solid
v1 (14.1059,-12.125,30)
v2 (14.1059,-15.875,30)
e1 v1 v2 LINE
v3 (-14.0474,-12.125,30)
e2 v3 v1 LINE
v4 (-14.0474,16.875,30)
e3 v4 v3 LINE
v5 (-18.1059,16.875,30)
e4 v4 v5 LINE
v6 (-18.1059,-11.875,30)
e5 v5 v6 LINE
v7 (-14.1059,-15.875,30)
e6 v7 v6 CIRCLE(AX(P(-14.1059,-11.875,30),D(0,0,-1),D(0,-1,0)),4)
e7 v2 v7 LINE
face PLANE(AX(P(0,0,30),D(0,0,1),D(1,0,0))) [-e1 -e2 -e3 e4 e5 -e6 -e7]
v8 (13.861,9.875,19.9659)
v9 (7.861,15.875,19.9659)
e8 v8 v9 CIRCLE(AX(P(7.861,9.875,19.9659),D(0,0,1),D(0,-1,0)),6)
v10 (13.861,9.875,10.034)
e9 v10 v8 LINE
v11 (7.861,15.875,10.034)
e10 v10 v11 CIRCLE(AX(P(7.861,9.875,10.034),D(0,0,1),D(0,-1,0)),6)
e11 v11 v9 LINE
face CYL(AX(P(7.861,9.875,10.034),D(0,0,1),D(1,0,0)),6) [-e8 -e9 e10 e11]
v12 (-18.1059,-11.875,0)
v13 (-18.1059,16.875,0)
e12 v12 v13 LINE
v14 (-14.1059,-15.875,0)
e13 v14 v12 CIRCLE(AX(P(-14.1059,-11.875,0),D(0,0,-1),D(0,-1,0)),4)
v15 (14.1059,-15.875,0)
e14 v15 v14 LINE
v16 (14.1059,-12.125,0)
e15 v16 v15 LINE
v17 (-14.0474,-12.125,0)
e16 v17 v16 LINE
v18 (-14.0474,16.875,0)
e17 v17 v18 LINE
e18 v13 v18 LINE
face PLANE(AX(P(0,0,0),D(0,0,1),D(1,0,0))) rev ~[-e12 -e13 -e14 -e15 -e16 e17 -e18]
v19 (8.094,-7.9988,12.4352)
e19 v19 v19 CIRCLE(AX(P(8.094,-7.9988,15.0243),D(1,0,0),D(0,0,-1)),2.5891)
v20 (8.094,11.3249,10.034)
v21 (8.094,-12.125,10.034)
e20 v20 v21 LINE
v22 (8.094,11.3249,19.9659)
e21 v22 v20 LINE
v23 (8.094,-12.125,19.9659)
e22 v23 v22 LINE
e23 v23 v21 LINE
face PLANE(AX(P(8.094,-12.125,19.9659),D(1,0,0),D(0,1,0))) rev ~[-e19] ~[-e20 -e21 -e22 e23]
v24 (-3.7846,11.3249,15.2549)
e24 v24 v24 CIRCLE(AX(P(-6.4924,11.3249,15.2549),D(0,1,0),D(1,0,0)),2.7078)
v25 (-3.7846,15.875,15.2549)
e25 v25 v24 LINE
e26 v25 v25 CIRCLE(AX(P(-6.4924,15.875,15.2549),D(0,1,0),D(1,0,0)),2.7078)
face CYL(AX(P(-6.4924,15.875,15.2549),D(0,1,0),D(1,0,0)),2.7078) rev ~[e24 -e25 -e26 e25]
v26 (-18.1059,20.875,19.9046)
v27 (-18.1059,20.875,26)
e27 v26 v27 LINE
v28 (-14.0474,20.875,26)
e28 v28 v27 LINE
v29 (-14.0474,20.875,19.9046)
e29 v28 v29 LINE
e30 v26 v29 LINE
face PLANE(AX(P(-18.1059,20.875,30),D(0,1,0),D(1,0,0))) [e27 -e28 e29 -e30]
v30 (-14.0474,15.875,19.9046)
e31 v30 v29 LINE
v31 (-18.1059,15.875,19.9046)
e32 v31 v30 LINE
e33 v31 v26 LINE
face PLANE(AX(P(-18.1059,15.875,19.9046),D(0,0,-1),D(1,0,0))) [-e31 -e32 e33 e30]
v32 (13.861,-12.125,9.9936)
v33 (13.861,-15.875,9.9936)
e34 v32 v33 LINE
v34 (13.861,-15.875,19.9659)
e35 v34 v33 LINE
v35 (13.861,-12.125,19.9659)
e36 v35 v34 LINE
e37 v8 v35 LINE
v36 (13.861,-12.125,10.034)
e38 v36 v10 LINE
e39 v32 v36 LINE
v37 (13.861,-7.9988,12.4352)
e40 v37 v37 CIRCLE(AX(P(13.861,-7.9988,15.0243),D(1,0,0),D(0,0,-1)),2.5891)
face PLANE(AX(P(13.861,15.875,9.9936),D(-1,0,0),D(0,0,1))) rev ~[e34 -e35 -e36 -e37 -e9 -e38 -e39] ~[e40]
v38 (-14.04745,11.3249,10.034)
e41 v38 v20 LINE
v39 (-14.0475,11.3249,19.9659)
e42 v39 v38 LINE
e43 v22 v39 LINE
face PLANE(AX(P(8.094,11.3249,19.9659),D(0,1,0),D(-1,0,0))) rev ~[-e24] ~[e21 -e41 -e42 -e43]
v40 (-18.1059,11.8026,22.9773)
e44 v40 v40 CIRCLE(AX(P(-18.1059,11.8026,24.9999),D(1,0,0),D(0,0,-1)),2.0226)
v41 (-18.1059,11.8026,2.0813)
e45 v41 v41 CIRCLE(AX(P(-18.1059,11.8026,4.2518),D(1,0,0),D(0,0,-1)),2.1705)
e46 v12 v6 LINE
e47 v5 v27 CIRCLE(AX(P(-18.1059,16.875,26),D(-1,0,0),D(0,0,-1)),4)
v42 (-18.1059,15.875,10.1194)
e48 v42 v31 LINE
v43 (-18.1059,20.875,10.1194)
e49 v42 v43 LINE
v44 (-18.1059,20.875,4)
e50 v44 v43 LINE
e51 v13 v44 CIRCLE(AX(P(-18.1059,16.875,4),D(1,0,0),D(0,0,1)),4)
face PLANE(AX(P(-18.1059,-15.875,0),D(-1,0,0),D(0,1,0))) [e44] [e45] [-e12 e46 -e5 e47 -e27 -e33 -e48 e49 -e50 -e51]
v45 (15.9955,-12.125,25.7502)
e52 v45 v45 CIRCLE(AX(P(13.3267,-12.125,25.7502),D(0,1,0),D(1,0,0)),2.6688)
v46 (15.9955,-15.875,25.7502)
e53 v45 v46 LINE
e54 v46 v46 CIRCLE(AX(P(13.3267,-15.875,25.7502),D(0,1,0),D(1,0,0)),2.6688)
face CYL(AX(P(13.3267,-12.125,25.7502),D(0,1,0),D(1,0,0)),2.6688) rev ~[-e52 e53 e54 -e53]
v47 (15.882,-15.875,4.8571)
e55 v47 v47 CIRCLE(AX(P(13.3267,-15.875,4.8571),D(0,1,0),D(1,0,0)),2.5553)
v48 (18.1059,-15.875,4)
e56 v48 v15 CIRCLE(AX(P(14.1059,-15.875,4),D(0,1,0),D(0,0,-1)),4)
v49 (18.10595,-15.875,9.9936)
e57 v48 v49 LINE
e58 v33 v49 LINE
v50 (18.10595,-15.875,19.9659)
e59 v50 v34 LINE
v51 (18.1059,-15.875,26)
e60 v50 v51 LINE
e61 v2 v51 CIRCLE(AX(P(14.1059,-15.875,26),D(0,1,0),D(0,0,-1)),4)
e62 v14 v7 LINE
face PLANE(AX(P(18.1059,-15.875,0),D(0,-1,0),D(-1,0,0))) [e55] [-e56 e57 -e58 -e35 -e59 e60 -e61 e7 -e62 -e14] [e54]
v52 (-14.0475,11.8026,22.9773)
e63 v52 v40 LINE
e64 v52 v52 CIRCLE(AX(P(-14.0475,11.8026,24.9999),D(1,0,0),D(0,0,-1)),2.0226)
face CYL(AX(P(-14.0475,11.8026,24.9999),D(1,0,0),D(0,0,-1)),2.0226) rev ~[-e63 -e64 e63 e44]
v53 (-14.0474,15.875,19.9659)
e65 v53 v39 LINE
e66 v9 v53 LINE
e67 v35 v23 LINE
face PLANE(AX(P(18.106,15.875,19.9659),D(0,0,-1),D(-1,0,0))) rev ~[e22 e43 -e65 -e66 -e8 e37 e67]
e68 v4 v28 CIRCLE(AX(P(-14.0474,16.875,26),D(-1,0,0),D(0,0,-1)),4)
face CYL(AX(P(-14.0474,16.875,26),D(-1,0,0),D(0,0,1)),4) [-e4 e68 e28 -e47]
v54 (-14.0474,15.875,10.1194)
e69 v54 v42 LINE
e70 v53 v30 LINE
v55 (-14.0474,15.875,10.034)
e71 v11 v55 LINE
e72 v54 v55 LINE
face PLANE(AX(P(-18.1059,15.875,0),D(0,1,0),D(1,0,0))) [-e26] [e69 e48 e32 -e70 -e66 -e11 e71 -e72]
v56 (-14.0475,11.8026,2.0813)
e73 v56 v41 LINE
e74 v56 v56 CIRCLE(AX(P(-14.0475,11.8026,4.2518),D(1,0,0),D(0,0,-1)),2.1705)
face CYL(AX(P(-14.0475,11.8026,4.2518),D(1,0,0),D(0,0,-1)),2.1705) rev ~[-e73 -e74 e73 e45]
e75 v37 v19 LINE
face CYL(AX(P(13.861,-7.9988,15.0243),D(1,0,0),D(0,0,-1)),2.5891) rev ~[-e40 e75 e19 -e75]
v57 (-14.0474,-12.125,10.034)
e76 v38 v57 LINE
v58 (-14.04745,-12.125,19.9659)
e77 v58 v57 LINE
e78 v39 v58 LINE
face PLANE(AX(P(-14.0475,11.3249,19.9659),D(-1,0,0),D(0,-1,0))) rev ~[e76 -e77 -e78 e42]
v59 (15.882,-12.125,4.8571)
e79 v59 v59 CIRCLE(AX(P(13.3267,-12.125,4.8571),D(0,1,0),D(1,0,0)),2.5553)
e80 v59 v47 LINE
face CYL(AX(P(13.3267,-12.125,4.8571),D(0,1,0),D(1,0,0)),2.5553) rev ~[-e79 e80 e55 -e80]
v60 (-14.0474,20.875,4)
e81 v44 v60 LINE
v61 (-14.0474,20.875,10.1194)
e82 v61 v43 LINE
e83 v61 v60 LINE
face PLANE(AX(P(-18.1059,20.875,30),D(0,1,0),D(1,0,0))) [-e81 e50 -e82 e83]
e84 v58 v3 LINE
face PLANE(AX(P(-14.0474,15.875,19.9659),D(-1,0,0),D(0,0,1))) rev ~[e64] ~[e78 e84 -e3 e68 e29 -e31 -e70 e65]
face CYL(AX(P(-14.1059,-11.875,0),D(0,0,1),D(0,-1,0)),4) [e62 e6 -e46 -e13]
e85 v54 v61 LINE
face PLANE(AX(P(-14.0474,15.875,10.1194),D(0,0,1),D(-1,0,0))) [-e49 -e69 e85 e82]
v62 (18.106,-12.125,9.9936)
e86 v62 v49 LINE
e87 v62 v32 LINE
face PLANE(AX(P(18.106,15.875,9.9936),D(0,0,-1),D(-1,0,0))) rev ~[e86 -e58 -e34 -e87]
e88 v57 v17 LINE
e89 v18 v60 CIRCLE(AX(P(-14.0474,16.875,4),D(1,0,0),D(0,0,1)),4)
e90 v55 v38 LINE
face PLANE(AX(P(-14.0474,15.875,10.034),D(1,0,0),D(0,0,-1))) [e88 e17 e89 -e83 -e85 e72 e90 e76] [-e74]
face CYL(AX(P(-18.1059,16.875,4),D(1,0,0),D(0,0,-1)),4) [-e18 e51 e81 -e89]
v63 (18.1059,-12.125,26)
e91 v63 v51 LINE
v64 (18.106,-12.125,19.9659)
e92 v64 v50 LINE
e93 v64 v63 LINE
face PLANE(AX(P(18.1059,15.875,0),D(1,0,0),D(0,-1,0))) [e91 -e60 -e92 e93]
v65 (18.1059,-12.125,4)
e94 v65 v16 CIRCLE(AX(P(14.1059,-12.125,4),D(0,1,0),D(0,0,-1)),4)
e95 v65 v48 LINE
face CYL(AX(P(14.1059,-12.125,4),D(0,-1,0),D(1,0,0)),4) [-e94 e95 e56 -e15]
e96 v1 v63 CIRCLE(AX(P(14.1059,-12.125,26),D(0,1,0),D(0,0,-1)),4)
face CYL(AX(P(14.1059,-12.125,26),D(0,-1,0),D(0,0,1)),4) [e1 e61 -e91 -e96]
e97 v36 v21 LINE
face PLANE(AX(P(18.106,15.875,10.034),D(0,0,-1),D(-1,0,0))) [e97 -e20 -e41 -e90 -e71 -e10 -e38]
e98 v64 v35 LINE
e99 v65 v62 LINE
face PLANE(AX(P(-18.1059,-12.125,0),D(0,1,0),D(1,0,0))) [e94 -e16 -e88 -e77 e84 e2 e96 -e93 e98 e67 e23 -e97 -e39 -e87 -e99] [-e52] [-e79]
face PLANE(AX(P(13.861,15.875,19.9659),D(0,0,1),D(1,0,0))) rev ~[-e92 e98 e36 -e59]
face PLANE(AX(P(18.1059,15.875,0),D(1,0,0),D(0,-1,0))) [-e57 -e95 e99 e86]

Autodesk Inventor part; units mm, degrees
ref_plane "YZ Plane" through (0, 0, 0) normal (1, 0, 0) x (0, 1, 0)
ref_plane "XZ Plane" through (0, 0, 0) normal (0, 1, 0) x (-1, 0, 0)
ref_plane "XY Plane" through (0, 0, 0) normal (0, 0, 1) x (1, 0, 0)
sketch "스케치1" plane through (0, 0, 0) normal (0, 0, 1) x (1, 0, 0)
  line L0 (18.1059, -15.875) -> (-18.1059, -15.875)
  line L1 (-18.1059, -15.875) -> (-18.1059, 15.875)
  line L2 (-18.1059, 15.875) -> (18.1059, 15.875)
  line L3 (18.1059, 15.875) -> (18.1059, -15.875)
  line L4 (18.1059, -15.875) -> (-18.1059, 15.875) construction
  line L5 (-18.1059, -15.875) -> (18.1059, 15.875) construction
  point P0 (0, 0)
extrude "돌출1" add sketch "스케치1" along normal blind 30
sketch "스케치2" plane through (-18.1059, 15.875, 0) normal (0, 1, 0) x (1, 0, 0)
  line L0 (0, -30) -> (36.2119, -30) projected
  line L1 (36.2119, 0) -> (36.2119, -30) projected
  line L2 (4.0585, -30) -> (36.2119, -30)
  line L3 (36.2119, -30) -> (36.2119, -19.9659)
  line L4 (36.2119, -19.9659) -> (4.0585, -19.9659)
  line L5 (4.0585, -19.9659) -> (4.0585, -30)
  line L6 (36.2119, 0) -> (0, 0) projected
  line L7 (4.0585, 0) -> (36.2119, 0)
  line L8 (36.2119, 0) -> (36.2119, -10.034)
  line L9 (36.2119, -10.034) -> (4.0585, -10.034)
  line L10 (4.0585, -10.034) -> (4.0585, 0)
  point P0 (18.1059, 0)
  dimension "d2" = 10.034
extrude "돌출2" cut sketch "스케치2" against normal blind 28
sketch "스케치3" plane through (-18.1059, 15.875, 30) normal (0, 1, 0) x (1, 0, 0)
  line L0 (4.0585, 10.0341) -> (36.2119, 10.0341) projected
  line L1 (36.2119, 30) -> (36.2119, 0) projected
  line L2 (31.9669, 10.0341) -> (36.2119, 10.0341)
  line L3 (36.2119, 10.0341) -> (36.2119, 20.0064)
  line L4 (36.2119, 20.0064) -> (31.9669, 20.0064)
  line L5 (31.9669, 20.0064) -> (31.9669, 10.0341)
  point P0 (18.1059, 30)
extrude "돌출3" cut sketch "스케치3" against normal blind 50
sketch "스케치4" plane through (-14.0475, -12.125, 19.9659) normal (0, 0, 1) x (1, 0, 0)
  line L0 (0, 0) -> (22.1415, 0)
  line L1 (22.1415, 0) -> (22.1415, 23.4499)
  line L2 (22.1415, 23.4499) -> (0, 23.4499)
  line L3 (0, 23.4499) -> (0, 0)
  point P0 (14.0475, 12.125)
extrude "돌출4" cut sketch "스케치4" against normal blind 50
sketch "스케치5" plane through (-14.0475, 15.875, 30) normal (1, 0, 0) x (0, 0, -1)
  circle A0 centre (5.0001, -4.0724) radius 2.0226
  circle A1 centre (25.7482, -4.0724) radius 2.1705
  point P0 (30, -15.875)
extrude "돌출5" cut sketch "스케치5" against normal blind 50
sketch "스케치6" plane through (-18.1059, -12.125, 0) normal (0, 1, 0) x (1, 0, 0)
  circle A0 centre (31.4326, -4.8571) radius 2.5553
  circle A1 centre (31.4326, -25.7502) radius 2.6688
  point P0 (18.1059, 0)
extrude "돌출6" cut sketch "스케치6" against normal blind 50
sketch "스케치7" plane through (-18.1059, 15.875, 30) normal (0, 1, 0) x (1, 0, 0)
  circle A0 centre (11.6135, 14.7451) radius 2.7078
  point P0 (18.1059, 30)
extrude "돌출7" cut sketch "스케치7" against normal blind 20
sketch "스케치8" plane through (13.861, 15.875, 19.9659) normal (1, 0, 0) x (0, 0, -1)
  circle A0 centre (4.9416, -23.8738) radius 2.5891
  point P0 (19.9659, -15.875)
extrude "돌출8" cut sketch "스케치8" against normal blind 20
fillet "모깎기1" radius 6 1 edges at (13.861, 15.875, 15)
sketch "스케치9" plane through (-14.0475, 15.875, 19.9659) normal (0, 1, 0) x (1, 0, 0)
  line L0 (-4.0585, 19.9659) -> (-4.0585, -10.0341) projected
  line L1 (-4.0585, 9.9335) -> (21.8906, 9.9335)
  line L2 (21.8906, 9.9335) -> (21.8906, -0.0015)
  line L3 (21.8906, -0.0015) -> (-4.0585, -0.0015)
  line L4 (-4.0585, -0.0015) -> (-4.0585, 9.9335)
  point P0 (14.0475, 19.9659)
  point P1 (-4.0585, 15.9659)
  point P2 (-4.0585, -6.0341)
sketch "스케치10" plane through (-14.0475, 15.875, 19.9659) normal (0, 1, 0) x (1, 0, 0)
  point P0 (14.0475, 19.9659)
sketch "스케치11" plane through (-18.1059, 15.875, 30) normal (0, 1, 0) x (1, 0, 0)
  line L0 (0, 30) -> (0, 0) projected
  line L1 (4.0585, 0) -> (4.0585, 30) projected
  line L2 (0, 30) -> (4.0585, 30)
  line L3 (4.0585, 30) -> (4.0585, 19.8806)
  line L4 (4.0585, 19.8806) -> (0, 19.8806)
  line L5 (0, 19.8806) -> (0, 30)
  line L6 (36.2119, 0) -> (4.0585, 0) projected
  line L7 (0, 10.0954) -> (4.0585, 10.0954)
  line L8 (4.0585, 10.0954) -> (4.0585, 0)
  line L9 (4.0585, 0) -> (0, 0)
  line L10 (0, 0) -> (0, 10.0954)
  point P0 (18.1059, 30)
extrude "돌출9" add sketch "스케치11" along normal blind 5 contours L2 L1 L4 L0 | L7 L1 L9 L0
fillet "모깎기3" radius 4 5 edges at (-16.0767, 20.875, 30) (-16.0767, 20.875, 0) (18.1059, -14, 30) (18.1059, -14, 0) (-18.1059, -15.875, 15)
properties part number "240510_3Dsketch04"
